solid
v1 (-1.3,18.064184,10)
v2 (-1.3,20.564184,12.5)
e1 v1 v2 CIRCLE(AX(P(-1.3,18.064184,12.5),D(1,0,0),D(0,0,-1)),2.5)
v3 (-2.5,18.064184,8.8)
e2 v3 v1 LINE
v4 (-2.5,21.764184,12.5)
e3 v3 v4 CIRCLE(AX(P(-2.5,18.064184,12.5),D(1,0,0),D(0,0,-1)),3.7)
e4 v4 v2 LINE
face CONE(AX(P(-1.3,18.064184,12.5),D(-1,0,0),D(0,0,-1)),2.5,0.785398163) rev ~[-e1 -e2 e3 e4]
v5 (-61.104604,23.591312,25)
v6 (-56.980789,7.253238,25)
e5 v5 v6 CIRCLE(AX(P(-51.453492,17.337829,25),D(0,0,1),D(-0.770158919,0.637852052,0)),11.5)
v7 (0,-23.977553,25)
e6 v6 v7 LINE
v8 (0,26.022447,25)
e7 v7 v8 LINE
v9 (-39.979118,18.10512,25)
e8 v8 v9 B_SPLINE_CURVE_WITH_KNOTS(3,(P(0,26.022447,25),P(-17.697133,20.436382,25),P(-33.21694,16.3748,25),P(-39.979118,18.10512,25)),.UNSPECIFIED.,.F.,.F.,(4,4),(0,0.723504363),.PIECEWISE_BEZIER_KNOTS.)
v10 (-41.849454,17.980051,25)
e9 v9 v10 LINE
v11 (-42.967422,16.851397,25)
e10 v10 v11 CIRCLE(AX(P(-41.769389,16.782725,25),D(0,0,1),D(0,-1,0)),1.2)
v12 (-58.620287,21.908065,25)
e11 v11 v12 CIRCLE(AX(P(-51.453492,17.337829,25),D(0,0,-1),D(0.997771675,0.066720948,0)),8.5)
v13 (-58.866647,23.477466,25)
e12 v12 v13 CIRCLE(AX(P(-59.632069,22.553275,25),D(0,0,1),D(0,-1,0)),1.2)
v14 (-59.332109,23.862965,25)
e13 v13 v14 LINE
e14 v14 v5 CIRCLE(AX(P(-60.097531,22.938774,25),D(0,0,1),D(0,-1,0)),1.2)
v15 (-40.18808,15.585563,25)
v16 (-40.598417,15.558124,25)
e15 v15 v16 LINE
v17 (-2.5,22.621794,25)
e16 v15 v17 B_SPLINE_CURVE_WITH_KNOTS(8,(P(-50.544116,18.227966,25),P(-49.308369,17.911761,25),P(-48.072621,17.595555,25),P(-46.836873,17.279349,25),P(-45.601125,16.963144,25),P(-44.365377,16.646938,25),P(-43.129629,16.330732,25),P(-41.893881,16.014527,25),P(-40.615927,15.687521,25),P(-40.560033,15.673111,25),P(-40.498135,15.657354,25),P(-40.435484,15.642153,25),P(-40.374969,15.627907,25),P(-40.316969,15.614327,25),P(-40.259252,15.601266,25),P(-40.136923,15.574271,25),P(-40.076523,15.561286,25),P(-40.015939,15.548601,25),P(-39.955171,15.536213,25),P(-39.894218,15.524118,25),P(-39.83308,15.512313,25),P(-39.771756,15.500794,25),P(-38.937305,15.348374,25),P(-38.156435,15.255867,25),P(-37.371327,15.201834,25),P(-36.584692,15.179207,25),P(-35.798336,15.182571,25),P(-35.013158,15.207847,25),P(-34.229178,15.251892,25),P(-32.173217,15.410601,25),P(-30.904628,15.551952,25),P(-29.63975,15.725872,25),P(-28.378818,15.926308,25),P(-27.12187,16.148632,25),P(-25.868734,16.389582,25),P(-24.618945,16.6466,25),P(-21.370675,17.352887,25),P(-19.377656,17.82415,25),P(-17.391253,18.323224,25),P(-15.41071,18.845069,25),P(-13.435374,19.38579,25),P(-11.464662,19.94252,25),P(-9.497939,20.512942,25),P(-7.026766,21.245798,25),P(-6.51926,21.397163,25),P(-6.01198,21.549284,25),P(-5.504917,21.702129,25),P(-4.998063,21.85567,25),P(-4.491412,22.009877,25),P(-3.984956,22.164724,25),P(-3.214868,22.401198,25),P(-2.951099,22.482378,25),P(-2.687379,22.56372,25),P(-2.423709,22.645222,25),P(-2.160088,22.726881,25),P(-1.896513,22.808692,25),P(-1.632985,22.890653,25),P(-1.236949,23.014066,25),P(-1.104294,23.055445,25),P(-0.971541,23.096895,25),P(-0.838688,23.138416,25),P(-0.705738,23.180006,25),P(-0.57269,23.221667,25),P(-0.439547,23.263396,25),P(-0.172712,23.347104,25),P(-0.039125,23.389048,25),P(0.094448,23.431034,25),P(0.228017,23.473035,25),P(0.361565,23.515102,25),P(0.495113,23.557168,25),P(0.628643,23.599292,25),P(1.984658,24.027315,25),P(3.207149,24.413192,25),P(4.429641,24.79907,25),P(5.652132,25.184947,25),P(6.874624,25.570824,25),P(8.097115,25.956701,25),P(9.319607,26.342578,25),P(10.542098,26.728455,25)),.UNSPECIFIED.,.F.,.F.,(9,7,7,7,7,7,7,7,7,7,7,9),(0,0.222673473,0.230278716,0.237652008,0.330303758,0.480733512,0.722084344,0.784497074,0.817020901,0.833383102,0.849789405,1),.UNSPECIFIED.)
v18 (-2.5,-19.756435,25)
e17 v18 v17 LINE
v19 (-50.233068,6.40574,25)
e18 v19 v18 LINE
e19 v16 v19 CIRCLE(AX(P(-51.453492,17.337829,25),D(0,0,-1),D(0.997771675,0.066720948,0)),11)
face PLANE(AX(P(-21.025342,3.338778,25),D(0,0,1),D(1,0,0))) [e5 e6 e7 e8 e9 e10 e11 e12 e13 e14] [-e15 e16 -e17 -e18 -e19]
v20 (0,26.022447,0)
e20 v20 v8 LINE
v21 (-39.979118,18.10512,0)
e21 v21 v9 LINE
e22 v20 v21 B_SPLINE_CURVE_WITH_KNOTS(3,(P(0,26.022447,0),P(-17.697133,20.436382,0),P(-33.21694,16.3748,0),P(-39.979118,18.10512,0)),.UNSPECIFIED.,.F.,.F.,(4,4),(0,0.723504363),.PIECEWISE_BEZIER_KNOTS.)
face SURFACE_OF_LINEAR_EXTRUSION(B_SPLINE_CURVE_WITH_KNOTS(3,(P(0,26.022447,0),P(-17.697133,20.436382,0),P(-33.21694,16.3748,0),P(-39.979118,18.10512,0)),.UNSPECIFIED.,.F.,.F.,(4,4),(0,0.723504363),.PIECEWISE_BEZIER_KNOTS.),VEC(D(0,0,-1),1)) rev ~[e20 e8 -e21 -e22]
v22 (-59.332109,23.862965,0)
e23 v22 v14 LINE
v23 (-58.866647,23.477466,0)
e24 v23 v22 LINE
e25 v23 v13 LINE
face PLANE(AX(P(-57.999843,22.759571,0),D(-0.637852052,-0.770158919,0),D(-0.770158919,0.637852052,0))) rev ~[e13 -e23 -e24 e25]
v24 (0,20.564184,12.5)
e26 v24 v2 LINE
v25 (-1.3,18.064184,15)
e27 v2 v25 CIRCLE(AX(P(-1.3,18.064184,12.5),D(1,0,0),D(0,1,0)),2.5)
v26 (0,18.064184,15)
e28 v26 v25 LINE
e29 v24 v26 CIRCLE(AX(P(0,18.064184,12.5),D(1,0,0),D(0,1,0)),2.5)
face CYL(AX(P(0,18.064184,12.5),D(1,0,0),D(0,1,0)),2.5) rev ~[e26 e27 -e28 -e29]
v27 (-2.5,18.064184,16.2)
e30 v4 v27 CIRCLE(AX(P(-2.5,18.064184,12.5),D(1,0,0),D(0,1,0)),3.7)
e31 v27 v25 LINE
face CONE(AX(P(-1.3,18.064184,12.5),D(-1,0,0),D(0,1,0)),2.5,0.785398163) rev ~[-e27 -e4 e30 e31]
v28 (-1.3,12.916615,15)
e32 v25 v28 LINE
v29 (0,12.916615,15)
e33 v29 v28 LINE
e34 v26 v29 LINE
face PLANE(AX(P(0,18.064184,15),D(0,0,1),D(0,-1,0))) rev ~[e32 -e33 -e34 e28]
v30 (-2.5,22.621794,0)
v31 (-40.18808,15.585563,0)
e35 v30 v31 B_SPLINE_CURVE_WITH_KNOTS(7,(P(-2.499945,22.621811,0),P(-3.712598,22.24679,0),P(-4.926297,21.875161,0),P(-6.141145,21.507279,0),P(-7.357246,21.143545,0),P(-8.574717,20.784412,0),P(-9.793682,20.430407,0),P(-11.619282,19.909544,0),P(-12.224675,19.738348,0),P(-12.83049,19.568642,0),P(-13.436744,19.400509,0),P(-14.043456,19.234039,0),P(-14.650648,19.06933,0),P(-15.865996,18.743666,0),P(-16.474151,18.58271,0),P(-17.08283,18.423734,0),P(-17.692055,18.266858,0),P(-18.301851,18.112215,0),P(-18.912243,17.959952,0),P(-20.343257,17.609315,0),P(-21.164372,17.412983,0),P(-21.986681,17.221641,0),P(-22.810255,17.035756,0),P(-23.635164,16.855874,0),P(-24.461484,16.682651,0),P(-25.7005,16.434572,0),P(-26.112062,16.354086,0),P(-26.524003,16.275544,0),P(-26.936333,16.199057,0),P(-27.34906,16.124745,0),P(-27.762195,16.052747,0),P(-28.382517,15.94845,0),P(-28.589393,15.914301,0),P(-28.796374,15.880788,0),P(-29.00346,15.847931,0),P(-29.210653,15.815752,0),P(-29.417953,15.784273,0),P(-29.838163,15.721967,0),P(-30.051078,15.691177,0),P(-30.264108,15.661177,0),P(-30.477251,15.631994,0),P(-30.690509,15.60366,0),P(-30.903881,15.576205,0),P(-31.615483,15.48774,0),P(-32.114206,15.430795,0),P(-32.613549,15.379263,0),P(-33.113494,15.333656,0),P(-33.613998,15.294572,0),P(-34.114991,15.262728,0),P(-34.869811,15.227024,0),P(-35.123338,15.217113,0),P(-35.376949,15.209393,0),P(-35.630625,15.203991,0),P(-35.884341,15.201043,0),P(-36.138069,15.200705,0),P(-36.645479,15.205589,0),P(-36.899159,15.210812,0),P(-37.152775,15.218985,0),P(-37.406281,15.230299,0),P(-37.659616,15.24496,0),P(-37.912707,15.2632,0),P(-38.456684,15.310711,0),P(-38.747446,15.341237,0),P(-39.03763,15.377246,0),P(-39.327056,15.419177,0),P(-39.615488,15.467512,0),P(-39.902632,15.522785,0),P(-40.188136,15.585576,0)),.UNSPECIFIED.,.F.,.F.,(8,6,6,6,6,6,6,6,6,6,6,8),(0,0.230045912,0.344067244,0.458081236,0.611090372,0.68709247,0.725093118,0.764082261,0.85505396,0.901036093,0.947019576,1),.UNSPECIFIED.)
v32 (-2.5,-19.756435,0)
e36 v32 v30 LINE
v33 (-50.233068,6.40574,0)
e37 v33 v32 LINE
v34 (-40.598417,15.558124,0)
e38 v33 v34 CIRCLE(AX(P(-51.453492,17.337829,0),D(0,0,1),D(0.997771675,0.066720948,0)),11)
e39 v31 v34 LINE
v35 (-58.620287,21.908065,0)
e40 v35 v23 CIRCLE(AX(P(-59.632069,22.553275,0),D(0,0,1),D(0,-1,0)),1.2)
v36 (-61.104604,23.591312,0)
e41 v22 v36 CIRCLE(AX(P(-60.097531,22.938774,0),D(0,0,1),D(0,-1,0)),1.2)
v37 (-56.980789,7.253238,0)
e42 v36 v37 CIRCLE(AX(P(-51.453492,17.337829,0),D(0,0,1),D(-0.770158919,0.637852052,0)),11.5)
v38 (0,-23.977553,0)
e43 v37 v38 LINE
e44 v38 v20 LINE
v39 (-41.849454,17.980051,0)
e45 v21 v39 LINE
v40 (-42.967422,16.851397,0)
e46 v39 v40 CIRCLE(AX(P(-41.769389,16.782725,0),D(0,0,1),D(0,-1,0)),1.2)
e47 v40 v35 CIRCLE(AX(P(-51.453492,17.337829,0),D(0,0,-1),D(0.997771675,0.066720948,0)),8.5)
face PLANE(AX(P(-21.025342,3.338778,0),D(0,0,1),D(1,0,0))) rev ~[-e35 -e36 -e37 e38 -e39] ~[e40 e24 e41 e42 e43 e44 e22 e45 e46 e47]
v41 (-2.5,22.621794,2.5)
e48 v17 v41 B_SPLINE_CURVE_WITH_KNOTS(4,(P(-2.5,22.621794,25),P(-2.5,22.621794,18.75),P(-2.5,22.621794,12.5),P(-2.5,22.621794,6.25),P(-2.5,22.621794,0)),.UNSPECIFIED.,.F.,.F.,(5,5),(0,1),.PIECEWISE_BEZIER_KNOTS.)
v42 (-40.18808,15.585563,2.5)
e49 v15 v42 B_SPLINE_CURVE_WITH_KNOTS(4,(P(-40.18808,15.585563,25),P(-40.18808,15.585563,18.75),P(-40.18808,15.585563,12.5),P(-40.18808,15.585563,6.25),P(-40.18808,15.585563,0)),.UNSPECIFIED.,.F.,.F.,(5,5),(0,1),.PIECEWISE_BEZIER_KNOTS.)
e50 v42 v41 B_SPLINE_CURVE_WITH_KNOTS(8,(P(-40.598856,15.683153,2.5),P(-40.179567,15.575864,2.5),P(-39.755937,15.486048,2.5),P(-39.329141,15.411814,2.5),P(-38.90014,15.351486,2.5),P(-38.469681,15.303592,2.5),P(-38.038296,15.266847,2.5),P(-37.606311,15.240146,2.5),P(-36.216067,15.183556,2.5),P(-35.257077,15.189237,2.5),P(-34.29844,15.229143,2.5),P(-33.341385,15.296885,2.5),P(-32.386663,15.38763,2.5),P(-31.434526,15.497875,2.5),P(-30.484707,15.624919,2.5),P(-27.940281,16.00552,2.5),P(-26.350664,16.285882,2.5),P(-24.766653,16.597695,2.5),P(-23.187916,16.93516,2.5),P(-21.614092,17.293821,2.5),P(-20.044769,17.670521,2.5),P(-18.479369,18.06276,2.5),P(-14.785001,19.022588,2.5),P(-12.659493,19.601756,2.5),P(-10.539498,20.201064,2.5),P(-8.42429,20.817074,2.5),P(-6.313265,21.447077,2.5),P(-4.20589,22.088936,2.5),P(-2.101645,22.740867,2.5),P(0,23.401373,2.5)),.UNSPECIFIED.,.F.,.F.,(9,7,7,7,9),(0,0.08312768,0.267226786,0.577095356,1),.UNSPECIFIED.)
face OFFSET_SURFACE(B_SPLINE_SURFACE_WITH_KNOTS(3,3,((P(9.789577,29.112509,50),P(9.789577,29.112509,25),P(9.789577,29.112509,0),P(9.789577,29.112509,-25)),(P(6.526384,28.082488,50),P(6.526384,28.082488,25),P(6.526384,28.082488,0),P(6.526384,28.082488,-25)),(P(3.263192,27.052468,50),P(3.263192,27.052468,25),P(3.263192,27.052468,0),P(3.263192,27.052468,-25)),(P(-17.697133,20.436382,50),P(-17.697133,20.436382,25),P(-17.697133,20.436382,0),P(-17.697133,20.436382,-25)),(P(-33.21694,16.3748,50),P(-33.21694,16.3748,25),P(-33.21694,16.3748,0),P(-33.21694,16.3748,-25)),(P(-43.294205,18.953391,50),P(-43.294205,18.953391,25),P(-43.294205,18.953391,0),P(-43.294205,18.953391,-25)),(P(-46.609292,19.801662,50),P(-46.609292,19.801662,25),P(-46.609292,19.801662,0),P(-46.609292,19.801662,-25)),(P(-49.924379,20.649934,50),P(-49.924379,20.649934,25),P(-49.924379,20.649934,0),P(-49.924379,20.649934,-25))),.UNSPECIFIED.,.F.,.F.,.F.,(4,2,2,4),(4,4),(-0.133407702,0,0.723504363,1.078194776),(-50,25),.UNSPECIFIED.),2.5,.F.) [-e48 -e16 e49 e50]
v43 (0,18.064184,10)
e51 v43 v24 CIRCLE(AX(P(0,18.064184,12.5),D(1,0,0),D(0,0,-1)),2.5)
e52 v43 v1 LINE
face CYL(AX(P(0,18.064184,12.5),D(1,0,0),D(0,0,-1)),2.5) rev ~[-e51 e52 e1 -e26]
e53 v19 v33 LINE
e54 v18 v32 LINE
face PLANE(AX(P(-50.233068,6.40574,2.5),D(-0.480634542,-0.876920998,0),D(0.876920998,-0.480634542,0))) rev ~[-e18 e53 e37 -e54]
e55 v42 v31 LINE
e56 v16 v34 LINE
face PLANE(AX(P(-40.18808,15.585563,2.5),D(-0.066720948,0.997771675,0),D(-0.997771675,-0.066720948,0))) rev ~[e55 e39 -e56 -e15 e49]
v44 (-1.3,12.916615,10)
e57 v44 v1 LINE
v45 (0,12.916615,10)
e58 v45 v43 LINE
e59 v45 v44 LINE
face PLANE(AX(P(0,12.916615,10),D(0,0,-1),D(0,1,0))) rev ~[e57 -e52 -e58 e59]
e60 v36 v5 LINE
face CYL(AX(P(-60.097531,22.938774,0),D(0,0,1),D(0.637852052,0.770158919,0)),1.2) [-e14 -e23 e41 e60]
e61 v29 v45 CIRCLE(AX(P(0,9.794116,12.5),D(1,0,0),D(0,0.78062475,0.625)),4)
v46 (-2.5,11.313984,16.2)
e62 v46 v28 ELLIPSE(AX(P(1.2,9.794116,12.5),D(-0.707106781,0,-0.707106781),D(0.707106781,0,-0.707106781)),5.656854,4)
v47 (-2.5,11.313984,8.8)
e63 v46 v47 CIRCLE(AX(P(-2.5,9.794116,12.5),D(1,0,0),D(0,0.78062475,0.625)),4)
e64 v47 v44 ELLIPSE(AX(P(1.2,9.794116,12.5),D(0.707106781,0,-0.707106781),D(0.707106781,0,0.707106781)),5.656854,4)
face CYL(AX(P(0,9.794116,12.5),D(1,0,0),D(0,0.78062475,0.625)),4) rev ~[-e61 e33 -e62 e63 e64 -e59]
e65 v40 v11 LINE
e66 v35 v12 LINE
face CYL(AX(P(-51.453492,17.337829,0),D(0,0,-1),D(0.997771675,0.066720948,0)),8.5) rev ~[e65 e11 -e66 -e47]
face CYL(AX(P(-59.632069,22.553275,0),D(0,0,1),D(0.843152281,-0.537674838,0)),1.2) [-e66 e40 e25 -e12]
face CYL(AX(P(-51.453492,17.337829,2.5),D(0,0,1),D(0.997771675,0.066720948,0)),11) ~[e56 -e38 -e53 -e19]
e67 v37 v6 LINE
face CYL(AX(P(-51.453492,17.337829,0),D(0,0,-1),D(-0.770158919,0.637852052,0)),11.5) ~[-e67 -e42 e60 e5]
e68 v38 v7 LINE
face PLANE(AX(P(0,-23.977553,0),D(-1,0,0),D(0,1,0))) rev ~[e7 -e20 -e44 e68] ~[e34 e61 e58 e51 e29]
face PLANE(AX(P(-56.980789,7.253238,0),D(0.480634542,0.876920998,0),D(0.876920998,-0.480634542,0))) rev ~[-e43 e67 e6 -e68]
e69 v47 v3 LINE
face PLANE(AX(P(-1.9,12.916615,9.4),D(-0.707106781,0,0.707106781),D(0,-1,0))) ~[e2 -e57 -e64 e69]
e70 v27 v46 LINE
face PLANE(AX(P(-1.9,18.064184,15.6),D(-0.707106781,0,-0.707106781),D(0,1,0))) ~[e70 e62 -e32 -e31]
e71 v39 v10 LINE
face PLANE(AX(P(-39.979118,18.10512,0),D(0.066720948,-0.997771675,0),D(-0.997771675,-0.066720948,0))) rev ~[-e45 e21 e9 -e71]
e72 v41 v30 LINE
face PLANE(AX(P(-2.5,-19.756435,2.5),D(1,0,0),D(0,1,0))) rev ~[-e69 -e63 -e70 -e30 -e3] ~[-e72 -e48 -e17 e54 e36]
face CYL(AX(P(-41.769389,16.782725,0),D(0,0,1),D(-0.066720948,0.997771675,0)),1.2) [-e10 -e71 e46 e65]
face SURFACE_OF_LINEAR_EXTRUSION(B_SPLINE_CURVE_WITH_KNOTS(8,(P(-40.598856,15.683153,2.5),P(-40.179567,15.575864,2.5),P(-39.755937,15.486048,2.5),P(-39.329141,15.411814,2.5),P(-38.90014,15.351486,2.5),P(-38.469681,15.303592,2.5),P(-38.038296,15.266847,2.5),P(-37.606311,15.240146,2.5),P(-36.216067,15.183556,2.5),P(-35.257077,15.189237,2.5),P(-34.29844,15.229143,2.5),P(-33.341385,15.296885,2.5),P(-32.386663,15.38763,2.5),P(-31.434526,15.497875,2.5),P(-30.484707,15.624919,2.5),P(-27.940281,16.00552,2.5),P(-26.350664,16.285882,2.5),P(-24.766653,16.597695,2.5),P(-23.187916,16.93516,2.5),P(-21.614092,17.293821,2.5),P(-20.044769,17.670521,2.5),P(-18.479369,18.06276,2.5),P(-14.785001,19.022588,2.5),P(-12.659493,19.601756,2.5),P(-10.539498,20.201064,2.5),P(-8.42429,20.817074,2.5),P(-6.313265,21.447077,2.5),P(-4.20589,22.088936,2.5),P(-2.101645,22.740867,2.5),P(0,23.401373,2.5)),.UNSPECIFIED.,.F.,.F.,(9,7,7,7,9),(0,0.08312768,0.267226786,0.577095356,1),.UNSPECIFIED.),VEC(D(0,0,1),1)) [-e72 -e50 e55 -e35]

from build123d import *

# Parameters (mm, degrees)
F1_DEPTH = 25
F2_R     = 1.2
F3_T     = -2.5
F4_DEPTH = 25
F6_DEPTH = 3
F7_SIZE  = 1.2


with BuildPart() as f1:
    # F0 (on Top) → F1 (new body)
    with BuildSketch(Plane.XY):
        with BuildLine():
            Line((0, -23.9775525033), (0, 0))
            Line((0, 0), (0, 26.0224474967))
            add(Edge.make_bspline(
                [(0, 26.0224474967), (-17.6971325381, 20.4363816506), (-33.2169395037, 16.3747998881), (-39.9791178567, 18.1051199008)],
                knots=[0, 0, 0, 0, 0.723504363, 0.723504363, 0.723504363, 0.723504363], degree=3))
            ThreePointArc((-39.9791178567, 18.1051199008), (-45.2661850168, 7.6441593667), (-56.9807893445, 7.2532375123))
            Line((-56.9807893445, 7.2532375123), (0, -23.9775525033))
        make_face()
        with BuildLine():
            ThreePointArc((-56.9807893445, 7.2532375123), (-45.2661850168, 7.6441593667), (-39.9791178567, 18.1051199008))
            Line((-39.9791178567, 18.1051199008), (-42.9724328811, 17.9049570556))
            ThreePointArc((-42.9724328811, 17.9049570556), (-54.0664587009, 9.2494171829), (-57.9998429251, 22.7595714353))
            Line((-57.9998429251, 22.7595714353), (-60.310319681, 24.6731275909))
            ThreePointArc((-60.310319681, 24.6731275909), (-62.749017961, 15.17887186), (-56.9807893445, 7.2532375123))
        make_face()
    extrude(amount=F1_DEPTH)

    # F2
    f2_edges = [f1.edges().sort_by_distance(p)[0] for p in [
        (-57.999843, 22.759571, 12.5),
        (-60.31032, 24.673128, 12.5),
        (-42.972433, 17.904957, 12.5),
    ]]
    fillet(f2_edges, radius=F2_R)

    # F3
    f3_openings = [f1.faces().sort_by_distance(p)[0] for p in [
        (-21.146453, 4.166771, 25),
    ]]
    offset(amount=F3_T, openings=f3_openings)

    # F4 (cut): a face of the model
    f4_faces = [f1.faces().sort_by_distance(p)[0] for p in [
        (-19.3393150943, 3.8306877566, 2.5),
    ]]
    extrude(f4_faces, amount=-F4_DEPTH, mode=Mode.SUBTRACT)

    # F5 (on face) → F6 (cut)
    with BuildSketch(Plane.YZ):
        with BuildLine():
            ThreePointArc((12.9166145043, 10), (13.5683701333, 11.1752351146), (13.7941155051, 12.5))
            ThreePointArc((13.7941155051, 12.5), (13.5683701333, 13.8247648854), (12.9166145043, 15))
            ThreePointArc((12.9166145043, 15), (5.7941155051, 12.5), (12.9166145043, 10))
        make_face()
        with BuildLine():
            ThreePointArc((20.5641841143, 12.5), (19.8319510673, 14.267766953), (18.0641841143, 15))
            ThreePointArc((18.0641841143, 15), (15.5641841143, 12.5), (18.0641841143, 10))
            ThreePointArc((18.0641841143, 10), (19.8319510673, 10.732233047), (20.5641841143, 12.5))
        make_face()
        with BuildLine():
            ThreePointArc((12.9166145043, 15), (13.5683701333, 13.8247648854), (13.7941155051, 12.5))
            ThreePointArc((13.7941155051, 12.5), (13.5683701333, 11.1752351146), (12.9166145043, 10))
            Line((12.9166145043, 10), (18.0641841143, 10))
            ThreePointArc((18.0641841143, 10), (15.5641841143, 12.5), (18.0641841143, 15))
            Line((18.0641841143, 15), (12.9166145043, 15))
        make_face()
    extrude(amount=-F6_DEPTH, mode=Mode.SUBTRACT)

    # F7
    f7_edges = [f1.edges().sort_by_distance(p)[0] for p in [
        (-2.5, 15.490399, 10),
        (-2.5, 15.490399, 15),
        (-2.5, 20.564184, 12.5),
    ]]
    chamfer(f7_edges, length=F7_SIZE)


solid = f1.part
